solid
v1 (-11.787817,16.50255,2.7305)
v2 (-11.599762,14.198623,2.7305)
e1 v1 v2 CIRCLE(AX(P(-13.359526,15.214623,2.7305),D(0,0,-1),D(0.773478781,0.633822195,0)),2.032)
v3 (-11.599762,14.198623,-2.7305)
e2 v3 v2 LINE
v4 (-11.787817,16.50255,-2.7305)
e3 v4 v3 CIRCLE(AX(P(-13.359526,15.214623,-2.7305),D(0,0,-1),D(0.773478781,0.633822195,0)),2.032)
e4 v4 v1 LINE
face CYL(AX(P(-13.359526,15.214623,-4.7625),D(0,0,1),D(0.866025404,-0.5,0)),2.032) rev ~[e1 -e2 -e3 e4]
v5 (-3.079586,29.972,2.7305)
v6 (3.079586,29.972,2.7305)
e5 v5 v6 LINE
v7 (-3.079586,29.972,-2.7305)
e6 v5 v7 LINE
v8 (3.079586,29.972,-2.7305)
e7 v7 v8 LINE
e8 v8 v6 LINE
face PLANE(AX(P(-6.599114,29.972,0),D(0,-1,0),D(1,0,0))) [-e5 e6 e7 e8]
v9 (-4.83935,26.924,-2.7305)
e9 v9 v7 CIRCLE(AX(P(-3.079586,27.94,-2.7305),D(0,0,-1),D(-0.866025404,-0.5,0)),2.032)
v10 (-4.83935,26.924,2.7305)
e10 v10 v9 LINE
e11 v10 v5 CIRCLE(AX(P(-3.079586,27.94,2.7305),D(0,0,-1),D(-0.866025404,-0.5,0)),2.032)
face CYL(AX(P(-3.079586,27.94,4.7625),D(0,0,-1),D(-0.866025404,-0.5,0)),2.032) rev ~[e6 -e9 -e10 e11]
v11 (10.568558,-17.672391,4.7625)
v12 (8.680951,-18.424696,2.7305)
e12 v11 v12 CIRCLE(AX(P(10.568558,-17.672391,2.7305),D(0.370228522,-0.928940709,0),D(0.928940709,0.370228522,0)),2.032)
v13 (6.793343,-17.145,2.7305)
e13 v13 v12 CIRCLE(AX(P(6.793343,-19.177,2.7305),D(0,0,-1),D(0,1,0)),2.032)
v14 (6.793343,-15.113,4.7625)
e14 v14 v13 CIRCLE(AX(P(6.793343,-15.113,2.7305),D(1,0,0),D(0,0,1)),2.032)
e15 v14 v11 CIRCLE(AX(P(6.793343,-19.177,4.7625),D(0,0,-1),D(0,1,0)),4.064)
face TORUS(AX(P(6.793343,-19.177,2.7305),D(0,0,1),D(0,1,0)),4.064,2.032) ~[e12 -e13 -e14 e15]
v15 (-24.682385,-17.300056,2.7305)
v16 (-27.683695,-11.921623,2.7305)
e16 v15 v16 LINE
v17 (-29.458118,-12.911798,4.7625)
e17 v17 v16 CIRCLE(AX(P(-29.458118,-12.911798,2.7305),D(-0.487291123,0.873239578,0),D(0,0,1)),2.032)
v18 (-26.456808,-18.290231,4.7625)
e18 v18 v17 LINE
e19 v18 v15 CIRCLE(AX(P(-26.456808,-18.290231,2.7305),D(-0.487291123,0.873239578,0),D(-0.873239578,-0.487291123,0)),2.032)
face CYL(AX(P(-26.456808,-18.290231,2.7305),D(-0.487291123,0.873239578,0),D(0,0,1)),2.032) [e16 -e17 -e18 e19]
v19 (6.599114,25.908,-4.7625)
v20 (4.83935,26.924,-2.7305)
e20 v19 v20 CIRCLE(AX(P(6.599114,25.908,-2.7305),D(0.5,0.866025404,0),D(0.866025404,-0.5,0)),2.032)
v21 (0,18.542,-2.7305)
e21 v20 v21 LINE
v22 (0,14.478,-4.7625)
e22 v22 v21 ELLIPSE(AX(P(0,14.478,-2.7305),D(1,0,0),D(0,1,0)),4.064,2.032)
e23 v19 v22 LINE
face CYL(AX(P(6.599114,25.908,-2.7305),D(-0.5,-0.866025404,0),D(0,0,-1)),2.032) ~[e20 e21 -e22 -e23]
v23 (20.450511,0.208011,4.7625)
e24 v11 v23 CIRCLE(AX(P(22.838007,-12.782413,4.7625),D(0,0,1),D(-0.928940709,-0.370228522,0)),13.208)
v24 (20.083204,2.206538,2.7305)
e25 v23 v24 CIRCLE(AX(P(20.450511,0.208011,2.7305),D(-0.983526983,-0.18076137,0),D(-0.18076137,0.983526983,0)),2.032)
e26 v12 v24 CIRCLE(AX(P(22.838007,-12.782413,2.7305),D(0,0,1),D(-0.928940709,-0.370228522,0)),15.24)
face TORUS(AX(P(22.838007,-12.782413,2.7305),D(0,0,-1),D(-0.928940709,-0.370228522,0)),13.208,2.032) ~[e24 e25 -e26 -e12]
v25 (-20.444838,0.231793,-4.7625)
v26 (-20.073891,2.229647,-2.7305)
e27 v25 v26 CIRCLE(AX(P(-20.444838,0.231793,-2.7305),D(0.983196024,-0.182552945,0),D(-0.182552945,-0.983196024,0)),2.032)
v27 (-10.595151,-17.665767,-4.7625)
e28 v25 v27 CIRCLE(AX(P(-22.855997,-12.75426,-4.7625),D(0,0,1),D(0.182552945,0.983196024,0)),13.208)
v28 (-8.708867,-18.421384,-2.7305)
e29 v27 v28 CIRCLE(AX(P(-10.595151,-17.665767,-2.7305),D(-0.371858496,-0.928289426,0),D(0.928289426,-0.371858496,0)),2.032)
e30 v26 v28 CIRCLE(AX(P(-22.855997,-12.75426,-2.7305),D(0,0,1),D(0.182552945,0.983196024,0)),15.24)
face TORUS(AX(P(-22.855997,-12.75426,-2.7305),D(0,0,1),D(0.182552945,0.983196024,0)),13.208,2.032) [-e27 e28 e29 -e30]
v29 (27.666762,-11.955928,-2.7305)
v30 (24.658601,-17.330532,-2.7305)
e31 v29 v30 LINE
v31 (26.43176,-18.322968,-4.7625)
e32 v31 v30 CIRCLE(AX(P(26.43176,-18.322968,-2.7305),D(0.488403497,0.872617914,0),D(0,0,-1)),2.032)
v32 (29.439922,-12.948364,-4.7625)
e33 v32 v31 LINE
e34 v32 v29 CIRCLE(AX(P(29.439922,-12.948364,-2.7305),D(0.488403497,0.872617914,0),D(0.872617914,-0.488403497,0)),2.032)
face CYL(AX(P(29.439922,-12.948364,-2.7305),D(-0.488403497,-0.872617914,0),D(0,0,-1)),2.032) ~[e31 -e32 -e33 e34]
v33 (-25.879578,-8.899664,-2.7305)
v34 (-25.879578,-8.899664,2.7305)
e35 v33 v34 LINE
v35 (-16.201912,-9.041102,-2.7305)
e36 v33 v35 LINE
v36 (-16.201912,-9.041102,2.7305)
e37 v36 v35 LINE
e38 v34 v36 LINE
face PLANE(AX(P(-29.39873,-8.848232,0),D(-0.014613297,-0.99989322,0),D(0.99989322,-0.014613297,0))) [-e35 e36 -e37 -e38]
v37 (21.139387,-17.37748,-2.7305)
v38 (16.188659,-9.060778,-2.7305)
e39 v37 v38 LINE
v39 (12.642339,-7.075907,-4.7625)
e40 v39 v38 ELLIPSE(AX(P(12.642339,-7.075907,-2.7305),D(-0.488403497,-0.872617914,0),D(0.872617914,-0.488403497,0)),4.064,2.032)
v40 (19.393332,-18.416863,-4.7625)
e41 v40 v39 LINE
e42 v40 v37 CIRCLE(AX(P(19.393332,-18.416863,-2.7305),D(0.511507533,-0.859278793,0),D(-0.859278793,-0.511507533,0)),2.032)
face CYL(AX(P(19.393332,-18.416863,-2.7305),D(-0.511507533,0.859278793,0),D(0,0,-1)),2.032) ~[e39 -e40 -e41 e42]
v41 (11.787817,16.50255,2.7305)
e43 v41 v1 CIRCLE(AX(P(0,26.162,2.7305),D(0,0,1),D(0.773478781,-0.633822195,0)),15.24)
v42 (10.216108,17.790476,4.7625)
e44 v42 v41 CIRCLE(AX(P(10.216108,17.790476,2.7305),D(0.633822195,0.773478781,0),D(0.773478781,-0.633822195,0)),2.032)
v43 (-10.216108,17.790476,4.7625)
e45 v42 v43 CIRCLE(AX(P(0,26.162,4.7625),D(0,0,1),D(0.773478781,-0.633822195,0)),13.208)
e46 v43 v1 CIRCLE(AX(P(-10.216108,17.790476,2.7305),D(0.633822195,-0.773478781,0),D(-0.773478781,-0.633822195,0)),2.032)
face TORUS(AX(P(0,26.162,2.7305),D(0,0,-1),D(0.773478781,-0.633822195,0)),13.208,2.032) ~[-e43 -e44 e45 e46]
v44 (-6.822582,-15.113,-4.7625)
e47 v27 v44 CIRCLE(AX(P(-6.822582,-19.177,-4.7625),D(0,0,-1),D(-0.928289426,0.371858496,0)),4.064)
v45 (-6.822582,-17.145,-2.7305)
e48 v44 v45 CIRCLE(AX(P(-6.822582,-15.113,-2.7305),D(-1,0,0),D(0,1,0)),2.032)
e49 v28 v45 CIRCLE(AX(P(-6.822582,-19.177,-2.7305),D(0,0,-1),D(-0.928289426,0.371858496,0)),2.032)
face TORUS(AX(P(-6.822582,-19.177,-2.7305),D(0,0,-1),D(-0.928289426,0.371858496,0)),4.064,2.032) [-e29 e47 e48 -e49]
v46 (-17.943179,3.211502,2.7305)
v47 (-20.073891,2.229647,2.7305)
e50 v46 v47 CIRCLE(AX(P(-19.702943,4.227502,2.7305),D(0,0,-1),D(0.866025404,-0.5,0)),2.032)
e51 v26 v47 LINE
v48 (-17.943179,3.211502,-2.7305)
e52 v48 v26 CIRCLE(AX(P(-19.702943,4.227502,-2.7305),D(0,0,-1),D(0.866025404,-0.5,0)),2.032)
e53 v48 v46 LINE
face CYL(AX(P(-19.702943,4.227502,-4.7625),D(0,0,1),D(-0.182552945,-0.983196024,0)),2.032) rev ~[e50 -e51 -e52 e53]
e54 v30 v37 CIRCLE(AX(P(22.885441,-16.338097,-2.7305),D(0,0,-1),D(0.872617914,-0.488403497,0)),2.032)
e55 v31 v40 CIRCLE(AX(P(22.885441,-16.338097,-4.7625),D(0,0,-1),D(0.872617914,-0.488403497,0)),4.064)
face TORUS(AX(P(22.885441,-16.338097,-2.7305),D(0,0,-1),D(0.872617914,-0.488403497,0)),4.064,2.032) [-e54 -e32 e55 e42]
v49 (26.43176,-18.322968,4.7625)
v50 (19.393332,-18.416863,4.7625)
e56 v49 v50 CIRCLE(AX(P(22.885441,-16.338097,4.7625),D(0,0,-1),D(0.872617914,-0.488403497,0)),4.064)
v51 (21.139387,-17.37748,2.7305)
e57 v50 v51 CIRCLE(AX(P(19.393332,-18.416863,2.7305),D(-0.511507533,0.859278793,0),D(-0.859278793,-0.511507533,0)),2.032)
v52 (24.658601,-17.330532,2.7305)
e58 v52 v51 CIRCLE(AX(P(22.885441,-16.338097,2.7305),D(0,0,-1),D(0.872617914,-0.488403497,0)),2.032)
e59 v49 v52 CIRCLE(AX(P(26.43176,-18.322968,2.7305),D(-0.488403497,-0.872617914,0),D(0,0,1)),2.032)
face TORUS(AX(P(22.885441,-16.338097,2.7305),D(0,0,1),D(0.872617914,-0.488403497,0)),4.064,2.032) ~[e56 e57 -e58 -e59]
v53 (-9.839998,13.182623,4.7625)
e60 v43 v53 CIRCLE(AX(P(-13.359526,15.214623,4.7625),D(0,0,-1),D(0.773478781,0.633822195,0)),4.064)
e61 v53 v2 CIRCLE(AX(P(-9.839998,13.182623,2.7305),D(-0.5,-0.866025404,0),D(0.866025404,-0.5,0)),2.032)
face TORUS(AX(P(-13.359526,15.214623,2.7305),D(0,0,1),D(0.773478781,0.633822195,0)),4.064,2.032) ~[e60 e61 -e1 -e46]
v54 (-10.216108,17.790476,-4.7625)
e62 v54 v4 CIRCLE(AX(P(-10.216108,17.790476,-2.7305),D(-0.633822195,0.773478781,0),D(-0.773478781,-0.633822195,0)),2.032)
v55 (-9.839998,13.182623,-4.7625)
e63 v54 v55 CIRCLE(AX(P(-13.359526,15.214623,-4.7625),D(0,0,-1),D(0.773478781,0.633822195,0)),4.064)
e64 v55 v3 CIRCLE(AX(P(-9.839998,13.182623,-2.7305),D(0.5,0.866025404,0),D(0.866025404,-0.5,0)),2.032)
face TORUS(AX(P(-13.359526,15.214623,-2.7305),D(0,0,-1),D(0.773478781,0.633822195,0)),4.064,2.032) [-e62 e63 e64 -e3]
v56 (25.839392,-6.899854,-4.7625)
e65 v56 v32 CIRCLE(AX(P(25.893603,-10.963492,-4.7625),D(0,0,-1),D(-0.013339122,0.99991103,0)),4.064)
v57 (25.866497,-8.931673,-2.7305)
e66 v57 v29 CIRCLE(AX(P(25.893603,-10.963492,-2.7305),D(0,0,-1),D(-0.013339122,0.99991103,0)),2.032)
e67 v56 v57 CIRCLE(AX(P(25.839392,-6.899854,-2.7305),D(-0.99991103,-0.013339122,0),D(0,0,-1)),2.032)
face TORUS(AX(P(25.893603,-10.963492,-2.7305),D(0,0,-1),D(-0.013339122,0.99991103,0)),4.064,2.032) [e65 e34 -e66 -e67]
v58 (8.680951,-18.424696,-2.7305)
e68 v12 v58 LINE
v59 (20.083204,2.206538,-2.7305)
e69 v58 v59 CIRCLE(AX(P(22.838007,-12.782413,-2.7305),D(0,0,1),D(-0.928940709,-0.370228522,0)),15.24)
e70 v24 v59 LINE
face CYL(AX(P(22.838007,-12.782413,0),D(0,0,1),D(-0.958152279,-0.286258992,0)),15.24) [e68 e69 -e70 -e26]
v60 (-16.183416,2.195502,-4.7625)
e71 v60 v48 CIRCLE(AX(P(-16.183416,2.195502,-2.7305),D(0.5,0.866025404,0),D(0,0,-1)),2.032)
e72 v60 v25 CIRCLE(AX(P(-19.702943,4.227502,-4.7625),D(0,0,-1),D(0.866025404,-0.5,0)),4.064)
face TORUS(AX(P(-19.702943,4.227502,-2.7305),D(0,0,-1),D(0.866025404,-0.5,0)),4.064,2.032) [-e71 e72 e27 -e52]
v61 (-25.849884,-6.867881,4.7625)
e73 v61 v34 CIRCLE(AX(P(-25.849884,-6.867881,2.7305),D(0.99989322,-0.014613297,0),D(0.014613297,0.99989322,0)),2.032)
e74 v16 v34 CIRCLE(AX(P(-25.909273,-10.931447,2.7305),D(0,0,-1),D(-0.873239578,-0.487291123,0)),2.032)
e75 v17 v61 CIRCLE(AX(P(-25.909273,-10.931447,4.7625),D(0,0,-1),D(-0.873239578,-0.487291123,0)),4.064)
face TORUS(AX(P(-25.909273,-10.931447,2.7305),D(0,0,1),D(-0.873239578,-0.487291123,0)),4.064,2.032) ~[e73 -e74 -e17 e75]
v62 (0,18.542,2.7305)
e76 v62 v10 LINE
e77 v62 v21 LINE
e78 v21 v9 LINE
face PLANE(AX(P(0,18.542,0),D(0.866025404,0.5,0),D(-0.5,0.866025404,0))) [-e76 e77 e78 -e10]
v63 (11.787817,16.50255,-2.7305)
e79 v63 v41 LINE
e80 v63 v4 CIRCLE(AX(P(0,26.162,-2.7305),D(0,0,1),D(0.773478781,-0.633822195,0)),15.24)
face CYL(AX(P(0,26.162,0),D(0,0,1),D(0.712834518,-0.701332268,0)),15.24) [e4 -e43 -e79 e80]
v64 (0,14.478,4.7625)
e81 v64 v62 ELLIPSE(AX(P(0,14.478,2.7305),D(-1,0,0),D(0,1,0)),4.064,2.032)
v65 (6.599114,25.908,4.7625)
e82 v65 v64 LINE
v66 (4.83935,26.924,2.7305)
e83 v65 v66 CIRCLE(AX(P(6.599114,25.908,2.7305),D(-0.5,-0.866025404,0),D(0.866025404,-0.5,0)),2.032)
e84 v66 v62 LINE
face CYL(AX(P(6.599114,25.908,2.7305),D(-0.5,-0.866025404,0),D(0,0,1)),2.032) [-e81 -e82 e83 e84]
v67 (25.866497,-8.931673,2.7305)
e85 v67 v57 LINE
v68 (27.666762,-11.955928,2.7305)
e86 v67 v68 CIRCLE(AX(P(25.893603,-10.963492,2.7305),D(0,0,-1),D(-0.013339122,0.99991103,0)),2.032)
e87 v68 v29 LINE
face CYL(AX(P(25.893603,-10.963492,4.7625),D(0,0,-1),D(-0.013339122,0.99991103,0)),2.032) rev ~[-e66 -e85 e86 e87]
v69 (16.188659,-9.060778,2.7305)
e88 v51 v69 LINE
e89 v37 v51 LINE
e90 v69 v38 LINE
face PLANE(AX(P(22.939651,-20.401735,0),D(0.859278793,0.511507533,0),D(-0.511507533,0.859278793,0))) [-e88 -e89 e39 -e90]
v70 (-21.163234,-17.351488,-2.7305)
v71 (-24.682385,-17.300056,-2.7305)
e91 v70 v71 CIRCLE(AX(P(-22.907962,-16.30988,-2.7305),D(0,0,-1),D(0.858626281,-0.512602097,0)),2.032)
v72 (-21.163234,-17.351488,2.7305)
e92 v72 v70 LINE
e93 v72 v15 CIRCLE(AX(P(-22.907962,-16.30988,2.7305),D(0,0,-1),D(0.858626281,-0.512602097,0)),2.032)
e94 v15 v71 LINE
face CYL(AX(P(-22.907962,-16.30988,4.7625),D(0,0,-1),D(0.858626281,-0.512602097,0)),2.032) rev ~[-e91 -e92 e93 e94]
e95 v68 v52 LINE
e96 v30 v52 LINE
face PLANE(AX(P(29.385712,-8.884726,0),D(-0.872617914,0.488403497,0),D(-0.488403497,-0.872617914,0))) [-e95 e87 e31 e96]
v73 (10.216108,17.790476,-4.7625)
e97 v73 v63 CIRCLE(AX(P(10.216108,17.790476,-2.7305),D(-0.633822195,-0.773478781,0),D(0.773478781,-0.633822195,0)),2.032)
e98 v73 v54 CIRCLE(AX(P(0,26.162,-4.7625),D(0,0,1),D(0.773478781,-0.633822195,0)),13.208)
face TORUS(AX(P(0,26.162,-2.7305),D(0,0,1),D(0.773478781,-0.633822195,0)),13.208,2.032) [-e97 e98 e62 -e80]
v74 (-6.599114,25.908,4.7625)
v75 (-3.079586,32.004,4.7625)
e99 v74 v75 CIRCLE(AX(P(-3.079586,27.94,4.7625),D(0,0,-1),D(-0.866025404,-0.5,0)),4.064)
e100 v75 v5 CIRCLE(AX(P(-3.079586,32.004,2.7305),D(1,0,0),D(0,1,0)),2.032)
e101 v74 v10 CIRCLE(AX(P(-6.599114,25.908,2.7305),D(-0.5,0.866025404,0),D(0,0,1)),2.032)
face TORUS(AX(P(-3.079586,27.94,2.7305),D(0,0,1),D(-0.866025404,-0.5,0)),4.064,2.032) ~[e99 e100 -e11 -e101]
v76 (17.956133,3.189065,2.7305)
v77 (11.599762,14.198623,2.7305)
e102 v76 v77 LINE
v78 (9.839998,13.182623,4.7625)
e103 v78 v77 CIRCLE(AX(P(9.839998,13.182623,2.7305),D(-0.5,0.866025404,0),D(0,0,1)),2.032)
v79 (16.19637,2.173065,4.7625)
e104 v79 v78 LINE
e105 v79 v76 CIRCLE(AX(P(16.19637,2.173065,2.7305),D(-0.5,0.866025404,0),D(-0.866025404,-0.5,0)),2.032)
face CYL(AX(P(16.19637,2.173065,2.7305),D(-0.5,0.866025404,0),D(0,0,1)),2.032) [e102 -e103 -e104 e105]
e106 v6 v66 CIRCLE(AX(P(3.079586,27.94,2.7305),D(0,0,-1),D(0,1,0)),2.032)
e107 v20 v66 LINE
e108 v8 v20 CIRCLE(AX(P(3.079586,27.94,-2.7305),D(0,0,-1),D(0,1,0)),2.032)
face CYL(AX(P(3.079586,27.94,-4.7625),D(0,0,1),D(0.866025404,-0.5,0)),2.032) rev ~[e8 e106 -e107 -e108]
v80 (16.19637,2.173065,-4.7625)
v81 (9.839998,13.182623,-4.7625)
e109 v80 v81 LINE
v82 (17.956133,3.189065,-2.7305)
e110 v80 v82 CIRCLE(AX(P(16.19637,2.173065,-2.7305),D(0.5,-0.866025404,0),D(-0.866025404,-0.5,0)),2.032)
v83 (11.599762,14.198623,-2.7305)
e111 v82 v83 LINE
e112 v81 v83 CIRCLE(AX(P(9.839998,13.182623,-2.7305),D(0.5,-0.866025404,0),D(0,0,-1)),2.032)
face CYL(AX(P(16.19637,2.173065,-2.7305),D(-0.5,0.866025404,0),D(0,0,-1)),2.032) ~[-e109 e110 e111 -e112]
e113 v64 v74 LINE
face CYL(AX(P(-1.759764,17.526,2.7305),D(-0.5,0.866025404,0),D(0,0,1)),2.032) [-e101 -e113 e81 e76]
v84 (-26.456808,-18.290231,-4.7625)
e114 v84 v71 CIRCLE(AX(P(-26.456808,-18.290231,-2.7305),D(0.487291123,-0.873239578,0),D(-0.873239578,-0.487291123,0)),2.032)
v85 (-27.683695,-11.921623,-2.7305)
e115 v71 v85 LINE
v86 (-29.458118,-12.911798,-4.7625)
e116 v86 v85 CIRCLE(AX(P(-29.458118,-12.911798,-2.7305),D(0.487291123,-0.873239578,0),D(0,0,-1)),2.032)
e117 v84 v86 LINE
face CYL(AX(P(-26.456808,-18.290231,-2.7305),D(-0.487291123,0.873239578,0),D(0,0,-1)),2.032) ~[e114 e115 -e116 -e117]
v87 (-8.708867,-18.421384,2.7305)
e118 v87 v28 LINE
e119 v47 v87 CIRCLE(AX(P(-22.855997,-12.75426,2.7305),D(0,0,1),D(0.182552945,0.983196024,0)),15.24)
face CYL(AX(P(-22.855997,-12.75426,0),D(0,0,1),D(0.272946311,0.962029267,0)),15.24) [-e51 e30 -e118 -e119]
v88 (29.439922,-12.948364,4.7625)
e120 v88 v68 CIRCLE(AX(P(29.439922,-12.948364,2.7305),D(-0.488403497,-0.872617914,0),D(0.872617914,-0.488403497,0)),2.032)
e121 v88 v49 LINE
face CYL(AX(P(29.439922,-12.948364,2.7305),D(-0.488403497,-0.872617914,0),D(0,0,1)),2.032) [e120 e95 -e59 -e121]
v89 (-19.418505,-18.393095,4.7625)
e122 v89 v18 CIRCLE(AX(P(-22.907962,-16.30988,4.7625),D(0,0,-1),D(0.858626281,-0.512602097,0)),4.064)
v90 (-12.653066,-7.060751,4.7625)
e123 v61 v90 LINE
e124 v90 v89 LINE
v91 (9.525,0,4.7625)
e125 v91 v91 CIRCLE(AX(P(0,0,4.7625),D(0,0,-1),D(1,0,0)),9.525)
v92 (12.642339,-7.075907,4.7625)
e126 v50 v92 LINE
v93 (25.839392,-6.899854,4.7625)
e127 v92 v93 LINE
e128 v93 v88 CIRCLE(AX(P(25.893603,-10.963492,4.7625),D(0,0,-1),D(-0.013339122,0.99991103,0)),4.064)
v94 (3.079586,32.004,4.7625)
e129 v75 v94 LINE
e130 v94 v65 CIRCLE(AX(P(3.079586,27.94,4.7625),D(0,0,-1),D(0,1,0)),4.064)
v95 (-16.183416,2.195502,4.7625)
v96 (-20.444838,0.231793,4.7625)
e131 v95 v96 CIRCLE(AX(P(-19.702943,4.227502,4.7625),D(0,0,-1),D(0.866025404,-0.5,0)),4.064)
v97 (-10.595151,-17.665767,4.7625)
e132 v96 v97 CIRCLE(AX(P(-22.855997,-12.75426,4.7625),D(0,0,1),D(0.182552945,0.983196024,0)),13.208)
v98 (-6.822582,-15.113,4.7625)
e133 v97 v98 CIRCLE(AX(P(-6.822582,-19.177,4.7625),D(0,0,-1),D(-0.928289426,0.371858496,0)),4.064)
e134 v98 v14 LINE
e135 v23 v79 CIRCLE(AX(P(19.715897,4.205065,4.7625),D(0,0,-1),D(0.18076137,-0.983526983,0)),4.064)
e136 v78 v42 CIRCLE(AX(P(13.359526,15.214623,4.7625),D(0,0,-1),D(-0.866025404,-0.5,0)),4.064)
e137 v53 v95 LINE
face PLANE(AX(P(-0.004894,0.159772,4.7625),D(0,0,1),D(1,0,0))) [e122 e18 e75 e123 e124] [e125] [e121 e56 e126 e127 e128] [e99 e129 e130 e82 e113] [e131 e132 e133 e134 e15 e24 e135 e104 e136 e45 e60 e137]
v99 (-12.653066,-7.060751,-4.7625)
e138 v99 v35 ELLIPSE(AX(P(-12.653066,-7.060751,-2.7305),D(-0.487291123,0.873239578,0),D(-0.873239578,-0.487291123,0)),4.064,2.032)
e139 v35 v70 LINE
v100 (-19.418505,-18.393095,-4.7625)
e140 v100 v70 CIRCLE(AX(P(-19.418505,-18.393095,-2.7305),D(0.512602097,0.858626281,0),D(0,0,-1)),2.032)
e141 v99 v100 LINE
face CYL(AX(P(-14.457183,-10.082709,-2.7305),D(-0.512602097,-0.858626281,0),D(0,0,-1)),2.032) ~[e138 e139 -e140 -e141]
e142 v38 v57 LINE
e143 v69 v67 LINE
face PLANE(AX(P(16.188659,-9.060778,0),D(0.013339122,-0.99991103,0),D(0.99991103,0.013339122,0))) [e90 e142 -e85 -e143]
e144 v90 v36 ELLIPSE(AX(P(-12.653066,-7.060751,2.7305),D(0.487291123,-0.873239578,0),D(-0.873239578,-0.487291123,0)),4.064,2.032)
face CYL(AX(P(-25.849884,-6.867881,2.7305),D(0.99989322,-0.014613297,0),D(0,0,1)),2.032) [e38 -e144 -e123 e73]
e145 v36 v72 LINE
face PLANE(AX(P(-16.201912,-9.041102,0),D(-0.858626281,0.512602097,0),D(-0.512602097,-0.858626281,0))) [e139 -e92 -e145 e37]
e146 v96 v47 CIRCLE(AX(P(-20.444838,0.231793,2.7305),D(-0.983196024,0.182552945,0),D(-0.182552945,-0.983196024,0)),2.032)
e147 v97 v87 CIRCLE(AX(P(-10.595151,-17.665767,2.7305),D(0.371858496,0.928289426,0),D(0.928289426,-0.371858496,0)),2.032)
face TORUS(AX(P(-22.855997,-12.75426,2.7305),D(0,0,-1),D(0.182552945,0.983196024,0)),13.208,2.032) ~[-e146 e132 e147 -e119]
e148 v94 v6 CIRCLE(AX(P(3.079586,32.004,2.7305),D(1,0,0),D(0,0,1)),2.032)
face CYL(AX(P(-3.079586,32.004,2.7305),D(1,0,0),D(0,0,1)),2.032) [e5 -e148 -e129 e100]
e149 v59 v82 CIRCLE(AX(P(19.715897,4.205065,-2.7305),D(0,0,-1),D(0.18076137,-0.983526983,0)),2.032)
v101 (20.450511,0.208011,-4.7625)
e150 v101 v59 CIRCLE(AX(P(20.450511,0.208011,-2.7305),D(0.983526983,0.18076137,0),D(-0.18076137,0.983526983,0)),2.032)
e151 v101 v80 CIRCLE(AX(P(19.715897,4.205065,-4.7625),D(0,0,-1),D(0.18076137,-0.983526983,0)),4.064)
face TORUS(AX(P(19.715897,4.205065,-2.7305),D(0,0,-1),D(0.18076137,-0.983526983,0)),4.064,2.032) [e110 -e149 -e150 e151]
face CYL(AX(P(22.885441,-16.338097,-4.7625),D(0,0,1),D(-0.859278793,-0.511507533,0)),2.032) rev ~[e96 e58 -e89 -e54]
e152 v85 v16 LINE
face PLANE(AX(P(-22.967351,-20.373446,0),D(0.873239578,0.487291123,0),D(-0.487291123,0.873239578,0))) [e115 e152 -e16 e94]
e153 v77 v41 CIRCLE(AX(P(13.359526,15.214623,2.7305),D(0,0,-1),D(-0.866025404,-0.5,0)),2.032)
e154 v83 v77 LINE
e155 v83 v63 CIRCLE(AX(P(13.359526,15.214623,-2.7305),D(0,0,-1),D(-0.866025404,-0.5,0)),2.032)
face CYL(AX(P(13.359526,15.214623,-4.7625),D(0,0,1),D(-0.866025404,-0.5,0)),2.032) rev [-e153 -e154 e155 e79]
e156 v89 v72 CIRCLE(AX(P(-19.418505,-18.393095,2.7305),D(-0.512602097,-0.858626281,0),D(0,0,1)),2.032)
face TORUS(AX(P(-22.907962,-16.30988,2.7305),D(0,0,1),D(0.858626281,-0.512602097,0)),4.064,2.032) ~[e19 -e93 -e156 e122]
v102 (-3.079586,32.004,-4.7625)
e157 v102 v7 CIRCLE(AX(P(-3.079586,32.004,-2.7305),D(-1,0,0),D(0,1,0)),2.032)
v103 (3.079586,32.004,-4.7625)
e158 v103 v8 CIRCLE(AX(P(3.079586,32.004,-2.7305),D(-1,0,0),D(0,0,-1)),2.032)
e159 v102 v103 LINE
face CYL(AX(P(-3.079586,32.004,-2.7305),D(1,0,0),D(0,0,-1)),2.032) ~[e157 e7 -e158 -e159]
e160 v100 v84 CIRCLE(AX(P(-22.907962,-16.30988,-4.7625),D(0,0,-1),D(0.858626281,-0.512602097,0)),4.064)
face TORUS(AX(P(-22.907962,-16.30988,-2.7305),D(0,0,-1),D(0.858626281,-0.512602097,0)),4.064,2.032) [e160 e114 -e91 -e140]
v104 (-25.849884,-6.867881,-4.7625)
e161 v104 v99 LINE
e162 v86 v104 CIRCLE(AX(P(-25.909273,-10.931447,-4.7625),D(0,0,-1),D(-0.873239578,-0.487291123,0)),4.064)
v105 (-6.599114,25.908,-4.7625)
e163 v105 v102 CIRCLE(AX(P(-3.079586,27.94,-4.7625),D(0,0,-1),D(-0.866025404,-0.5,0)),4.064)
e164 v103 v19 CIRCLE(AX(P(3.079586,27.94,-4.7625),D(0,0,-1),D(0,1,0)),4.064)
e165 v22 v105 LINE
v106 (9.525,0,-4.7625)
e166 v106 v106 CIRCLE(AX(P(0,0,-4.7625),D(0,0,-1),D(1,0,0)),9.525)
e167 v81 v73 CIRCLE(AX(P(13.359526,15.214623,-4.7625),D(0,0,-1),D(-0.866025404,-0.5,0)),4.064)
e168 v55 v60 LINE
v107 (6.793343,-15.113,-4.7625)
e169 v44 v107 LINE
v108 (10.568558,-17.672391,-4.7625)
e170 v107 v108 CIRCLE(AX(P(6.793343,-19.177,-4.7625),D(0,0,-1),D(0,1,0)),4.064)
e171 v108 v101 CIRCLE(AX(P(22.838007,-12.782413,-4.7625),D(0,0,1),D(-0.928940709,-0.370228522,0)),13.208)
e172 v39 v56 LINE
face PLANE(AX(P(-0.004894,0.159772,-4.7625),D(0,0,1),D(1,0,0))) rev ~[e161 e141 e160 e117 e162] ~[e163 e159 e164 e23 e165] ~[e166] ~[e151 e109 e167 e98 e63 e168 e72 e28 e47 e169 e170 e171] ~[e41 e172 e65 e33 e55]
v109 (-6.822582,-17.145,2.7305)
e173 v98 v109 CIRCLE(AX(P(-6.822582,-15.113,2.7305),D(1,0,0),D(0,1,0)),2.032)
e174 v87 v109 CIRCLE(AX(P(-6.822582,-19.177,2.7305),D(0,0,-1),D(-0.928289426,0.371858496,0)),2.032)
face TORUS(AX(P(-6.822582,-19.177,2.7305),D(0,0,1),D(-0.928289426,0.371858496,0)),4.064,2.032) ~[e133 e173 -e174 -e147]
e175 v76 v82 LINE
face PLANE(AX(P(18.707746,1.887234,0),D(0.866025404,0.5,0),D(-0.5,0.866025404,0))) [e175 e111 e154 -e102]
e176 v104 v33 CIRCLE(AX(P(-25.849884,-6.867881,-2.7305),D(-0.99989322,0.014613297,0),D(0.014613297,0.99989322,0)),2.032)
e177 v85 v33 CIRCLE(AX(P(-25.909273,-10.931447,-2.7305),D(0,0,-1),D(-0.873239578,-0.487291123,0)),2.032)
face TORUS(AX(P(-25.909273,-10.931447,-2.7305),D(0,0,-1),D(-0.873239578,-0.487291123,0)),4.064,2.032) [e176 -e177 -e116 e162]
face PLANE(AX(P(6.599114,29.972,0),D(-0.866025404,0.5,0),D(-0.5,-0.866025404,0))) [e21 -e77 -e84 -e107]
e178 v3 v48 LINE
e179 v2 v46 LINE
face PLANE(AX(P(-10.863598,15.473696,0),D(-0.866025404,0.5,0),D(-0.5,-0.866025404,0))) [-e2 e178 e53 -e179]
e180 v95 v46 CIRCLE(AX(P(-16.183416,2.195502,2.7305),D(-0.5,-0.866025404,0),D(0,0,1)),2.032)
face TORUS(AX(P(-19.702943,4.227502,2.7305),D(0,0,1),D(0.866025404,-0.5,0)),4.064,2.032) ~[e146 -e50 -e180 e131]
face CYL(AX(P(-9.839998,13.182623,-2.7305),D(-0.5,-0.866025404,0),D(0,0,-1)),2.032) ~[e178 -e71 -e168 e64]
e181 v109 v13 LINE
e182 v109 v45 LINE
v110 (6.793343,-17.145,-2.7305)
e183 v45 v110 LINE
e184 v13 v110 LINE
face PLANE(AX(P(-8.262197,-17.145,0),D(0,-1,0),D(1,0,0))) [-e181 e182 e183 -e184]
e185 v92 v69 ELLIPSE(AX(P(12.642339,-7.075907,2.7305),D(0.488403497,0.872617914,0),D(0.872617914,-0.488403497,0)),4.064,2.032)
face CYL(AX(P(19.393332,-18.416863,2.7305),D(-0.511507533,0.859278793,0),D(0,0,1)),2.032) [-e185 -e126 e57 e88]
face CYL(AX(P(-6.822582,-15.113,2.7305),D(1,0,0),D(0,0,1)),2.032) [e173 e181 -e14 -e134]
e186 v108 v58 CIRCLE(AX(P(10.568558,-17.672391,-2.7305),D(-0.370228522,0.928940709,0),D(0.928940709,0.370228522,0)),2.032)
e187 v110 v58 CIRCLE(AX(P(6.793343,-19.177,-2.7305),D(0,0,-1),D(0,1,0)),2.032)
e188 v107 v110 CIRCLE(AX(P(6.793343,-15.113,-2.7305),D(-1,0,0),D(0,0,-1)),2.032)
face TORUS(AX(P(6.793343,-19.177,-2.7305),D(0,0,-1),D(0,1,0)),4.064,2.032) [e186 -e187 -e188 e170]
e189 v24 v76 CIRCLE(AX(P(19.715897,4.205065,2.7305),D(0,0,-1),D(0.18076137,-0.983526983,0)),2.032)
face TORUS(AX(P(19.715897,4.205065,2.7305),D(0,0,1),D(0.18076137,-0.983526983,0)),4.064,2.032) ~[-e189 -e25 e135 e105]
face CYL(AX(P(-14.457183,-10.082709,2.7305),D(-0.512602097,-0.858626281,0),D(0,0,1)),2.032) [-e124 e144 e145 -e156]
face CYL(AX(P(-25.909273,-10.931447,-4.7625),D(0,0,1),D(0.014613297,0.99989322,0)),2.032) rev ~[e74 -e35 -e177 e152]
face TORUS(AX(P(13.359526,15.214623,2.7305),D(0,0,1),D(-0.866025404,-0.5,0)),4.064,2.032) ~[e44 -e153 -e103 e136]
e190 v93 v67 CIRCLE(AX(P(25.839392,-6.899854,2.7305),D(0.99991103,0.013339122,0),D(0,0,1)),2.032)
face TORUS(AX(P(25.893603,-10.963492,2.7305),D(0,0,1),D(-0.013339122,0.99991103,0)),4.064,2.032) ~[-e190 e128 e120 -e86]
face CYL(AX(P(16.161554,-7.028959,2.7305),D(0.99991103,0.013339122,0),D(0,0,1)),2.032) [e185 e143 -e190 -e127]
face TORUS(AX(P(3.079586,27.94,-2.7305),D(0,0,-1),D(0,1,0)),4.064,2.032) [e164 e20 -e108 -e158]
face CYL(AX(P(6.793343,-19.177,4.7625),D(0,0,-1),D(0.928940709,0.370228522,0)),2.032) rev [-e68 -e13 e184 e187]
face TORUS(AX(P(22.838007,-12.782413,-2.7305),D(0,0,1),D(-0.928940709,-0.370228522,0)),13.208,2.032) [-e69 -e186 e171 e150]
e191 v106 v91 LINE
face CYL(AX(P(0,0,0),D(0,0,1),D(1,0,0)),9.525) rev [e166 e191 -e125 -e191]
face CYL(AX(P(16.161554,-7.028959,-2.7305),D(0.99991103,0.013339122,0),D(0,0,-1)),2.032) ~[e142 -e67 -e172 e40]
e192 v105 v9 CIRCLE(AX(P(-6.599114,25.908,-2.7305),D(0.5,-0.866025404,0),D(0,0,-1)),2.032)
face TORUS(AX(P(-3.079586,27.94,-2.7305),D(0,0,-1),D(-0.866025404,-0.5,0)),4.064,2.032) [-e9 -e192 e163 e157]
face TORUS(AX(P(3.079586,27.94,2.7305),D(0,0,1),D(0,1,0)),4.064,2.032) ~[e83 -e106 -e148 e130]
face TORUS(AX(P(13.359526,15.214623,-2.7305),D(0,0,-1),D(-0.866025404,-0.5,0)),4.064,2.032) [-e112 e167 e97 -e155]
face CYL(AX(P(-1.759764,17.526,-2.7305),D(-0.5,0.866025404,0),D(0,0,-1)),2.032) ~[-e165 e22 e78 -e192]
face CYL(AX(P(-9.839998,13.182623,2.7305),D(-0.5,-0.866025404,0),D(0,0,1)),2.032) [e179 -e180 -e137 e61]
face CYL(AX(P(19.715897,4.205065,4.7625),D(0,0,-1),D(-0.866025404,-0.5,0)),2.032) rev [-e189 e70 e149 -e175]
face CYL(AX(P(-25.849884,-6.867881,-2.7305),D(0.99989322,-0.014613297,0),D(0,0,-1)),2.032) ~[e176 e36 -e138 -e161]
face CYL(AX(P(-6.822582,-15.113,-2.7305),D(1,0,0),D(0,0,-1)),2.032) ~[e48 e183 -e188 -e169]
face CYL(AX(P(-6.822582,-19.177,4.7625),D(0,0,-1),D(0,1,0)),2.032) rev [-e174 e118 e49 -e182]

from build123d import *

# Parameters (mm, degrees)
F1_DEPTH = 4.7625
F2_F1_R  = 2.032
F2_F2_R  = 2.032


with BuildPart() as f1:
    # F0 (on Top) → F1 (new body, symmetric)
    with BuildSketch(Plane.XY):
        with BuildLine():
            Line((18.7077457017, 1.8872339495), (10.8635980467, 15.47369623))
            ThreePointArc((10.8635980467, 15.47369623), (0, 41.402), (-10.8635980467, 15.47369623))
            Line((-10.8635980467, 15.47369623), (-18.6962956709, 1.9070659847))
            ThreePointArc((-18.6962956709, 1.9070659847), (-36.2227009747, -20.0746997122), (-8.2621973021, -17.145))
            Line((-8.2621973021, -17.145), (8.2357664047, -17.145))
            ThreePointArc((8.2357664047, -17.145), (36.1902781622, -20.1291440989), (18.7077457017, 1.8872339495))
        make_face()
        Polygon((-29.3987297089, -8.8482320732), (-16.201911861, -9.0411016919), (-22.9673507744, -20.3734463879), align=None, mode=Mode.SUBTRACT)
        Polygon((22.9396512431, -20.4017350098), (16.1886586268, -9.0607783176), (29.3857115337, -8.8847255573), align=None, mode=Mode.SUBTRACT)
        with BuildLine():
            ThreePointArc((0, 9.525), (6.7351920908, 6.7351920908), (9.525, 0))
            ThreePointArc((9.525, 0), (-6.7351920908, -6.7351920908), (0, 9.525))
        make_face(mode=Mode.SUBTRACT)
        Polygon((6.5991135768, 29.972), (0, 18.542), (-6.5991135768, 29.972), align=None, mode=Mode.SUBTRACT)
    extrude(amount=F1_DEPTH, both=True)

    # F2: fillet of radius 2.032 on 24 edges, made by hand

    # F2_f1
    f2_f1_edges = [f1.edges().sort_by_distance(p)[0] for p in [
        (10.8635980467, 15.47369623, 0),
        (-10.8635980467, 15.47369623, 0),
        (-18.6962956709, 1.9070659847, 0),
        (-8.2621973021, -17.145, 0),
        (18.7077457017, 1.8872339495, 0),
        (8.2357664047, -17.145, 0),
        (-29.3987297089, -8.8482320732, 0),
        (-22.9673507744, -20.3734463879, 0),
        (-6.5991135768, 29.972, 0),
        (6.5991135768, 29.972, 0),
        (29.3857115337, -8.8847255573, 0),
        (22.9396512431, -20.4017350098, 0),
    ]]
    fillet(f2_f1_edges, radius=F2_F1_R)

    # F2_f2
    f2_f2_edges = [f1.edges().sort_by_distance(p)[0] for p in [
        (0, 41.402, -4.7625),
        (0, 41.402, 4.7625),
        (-36.2076281274, -20.1021548654, -4.7625),
        (-36.2076281274, -20.1021548654, 4.7625),
        (36.1764741613, -20.1541764802, -4.7625),
        (36.1764741613, -20.1541764802, 4.7625),
        (-26.1830402417, -14.6108392305, -4.7625),
        (-26.1830402417, -14.6108392305, 4.7625),
        (0, 29.972, 4.7625),
        (0, 29.972, -4.7625),
        (26.1626813884, -14.6432302836, -4.7625),
        (26.1626813884, -14.6432302836, 4.7625),
        (27.6396570272, -9.9241088651, 4.7625),
        (22.9125461475, -18.369915797, 4.7625),
        (27.6396570272, -9.9241088651, -4.7625),
        (22.9125461475, -18.369915797, -4.7625),
        (-4.8393499563, 28.956, -4.7625),
        (4.8393499563, 28.956, -4.7625),
        (-4.8393499563, 28.956, 4.7625),
        (4.8393499563, 28.956, 4.7625),
        (-22.9376565541, -18.3416633647, 4.7625),
        (-27.654001106, -9.8898395339, 4.7625),
        (-22.9376565541, -18.3416633647, -4.7625),
        (-27.654001106, -9.8898395339, -4.7625),
        (7.9335935166, -17.4950804933, 4.7625),
        (18.8637972742, 2.3603563212, 4.7625),
        (7.9335935166, -17.4950804933, -4.7625),
        (18.8637972742, 2.3603563212, -4.7625),
        (-18.8525242851, 2.3820174573, 4.7625),
        (-7.9613562378, -17.4940804155, 4.7625),
        (-18.8525242851, 2.3820174573, -4.7625),
        (-7.9613562378, -17.4940804155, -4.7625),
        (11.3342608816, 15.3799323911, 4.7625),
        (-11.3342608816, 15.3799323911, 4.7625),
        (11.3342608816, 15.3799323911, -4.7625),
        (-11.3342608816, 15.3799323911, -4.7625),
    ]]
    fillet(f2_f2_edges, radius=F2_F2_R)


solid = f1.part
